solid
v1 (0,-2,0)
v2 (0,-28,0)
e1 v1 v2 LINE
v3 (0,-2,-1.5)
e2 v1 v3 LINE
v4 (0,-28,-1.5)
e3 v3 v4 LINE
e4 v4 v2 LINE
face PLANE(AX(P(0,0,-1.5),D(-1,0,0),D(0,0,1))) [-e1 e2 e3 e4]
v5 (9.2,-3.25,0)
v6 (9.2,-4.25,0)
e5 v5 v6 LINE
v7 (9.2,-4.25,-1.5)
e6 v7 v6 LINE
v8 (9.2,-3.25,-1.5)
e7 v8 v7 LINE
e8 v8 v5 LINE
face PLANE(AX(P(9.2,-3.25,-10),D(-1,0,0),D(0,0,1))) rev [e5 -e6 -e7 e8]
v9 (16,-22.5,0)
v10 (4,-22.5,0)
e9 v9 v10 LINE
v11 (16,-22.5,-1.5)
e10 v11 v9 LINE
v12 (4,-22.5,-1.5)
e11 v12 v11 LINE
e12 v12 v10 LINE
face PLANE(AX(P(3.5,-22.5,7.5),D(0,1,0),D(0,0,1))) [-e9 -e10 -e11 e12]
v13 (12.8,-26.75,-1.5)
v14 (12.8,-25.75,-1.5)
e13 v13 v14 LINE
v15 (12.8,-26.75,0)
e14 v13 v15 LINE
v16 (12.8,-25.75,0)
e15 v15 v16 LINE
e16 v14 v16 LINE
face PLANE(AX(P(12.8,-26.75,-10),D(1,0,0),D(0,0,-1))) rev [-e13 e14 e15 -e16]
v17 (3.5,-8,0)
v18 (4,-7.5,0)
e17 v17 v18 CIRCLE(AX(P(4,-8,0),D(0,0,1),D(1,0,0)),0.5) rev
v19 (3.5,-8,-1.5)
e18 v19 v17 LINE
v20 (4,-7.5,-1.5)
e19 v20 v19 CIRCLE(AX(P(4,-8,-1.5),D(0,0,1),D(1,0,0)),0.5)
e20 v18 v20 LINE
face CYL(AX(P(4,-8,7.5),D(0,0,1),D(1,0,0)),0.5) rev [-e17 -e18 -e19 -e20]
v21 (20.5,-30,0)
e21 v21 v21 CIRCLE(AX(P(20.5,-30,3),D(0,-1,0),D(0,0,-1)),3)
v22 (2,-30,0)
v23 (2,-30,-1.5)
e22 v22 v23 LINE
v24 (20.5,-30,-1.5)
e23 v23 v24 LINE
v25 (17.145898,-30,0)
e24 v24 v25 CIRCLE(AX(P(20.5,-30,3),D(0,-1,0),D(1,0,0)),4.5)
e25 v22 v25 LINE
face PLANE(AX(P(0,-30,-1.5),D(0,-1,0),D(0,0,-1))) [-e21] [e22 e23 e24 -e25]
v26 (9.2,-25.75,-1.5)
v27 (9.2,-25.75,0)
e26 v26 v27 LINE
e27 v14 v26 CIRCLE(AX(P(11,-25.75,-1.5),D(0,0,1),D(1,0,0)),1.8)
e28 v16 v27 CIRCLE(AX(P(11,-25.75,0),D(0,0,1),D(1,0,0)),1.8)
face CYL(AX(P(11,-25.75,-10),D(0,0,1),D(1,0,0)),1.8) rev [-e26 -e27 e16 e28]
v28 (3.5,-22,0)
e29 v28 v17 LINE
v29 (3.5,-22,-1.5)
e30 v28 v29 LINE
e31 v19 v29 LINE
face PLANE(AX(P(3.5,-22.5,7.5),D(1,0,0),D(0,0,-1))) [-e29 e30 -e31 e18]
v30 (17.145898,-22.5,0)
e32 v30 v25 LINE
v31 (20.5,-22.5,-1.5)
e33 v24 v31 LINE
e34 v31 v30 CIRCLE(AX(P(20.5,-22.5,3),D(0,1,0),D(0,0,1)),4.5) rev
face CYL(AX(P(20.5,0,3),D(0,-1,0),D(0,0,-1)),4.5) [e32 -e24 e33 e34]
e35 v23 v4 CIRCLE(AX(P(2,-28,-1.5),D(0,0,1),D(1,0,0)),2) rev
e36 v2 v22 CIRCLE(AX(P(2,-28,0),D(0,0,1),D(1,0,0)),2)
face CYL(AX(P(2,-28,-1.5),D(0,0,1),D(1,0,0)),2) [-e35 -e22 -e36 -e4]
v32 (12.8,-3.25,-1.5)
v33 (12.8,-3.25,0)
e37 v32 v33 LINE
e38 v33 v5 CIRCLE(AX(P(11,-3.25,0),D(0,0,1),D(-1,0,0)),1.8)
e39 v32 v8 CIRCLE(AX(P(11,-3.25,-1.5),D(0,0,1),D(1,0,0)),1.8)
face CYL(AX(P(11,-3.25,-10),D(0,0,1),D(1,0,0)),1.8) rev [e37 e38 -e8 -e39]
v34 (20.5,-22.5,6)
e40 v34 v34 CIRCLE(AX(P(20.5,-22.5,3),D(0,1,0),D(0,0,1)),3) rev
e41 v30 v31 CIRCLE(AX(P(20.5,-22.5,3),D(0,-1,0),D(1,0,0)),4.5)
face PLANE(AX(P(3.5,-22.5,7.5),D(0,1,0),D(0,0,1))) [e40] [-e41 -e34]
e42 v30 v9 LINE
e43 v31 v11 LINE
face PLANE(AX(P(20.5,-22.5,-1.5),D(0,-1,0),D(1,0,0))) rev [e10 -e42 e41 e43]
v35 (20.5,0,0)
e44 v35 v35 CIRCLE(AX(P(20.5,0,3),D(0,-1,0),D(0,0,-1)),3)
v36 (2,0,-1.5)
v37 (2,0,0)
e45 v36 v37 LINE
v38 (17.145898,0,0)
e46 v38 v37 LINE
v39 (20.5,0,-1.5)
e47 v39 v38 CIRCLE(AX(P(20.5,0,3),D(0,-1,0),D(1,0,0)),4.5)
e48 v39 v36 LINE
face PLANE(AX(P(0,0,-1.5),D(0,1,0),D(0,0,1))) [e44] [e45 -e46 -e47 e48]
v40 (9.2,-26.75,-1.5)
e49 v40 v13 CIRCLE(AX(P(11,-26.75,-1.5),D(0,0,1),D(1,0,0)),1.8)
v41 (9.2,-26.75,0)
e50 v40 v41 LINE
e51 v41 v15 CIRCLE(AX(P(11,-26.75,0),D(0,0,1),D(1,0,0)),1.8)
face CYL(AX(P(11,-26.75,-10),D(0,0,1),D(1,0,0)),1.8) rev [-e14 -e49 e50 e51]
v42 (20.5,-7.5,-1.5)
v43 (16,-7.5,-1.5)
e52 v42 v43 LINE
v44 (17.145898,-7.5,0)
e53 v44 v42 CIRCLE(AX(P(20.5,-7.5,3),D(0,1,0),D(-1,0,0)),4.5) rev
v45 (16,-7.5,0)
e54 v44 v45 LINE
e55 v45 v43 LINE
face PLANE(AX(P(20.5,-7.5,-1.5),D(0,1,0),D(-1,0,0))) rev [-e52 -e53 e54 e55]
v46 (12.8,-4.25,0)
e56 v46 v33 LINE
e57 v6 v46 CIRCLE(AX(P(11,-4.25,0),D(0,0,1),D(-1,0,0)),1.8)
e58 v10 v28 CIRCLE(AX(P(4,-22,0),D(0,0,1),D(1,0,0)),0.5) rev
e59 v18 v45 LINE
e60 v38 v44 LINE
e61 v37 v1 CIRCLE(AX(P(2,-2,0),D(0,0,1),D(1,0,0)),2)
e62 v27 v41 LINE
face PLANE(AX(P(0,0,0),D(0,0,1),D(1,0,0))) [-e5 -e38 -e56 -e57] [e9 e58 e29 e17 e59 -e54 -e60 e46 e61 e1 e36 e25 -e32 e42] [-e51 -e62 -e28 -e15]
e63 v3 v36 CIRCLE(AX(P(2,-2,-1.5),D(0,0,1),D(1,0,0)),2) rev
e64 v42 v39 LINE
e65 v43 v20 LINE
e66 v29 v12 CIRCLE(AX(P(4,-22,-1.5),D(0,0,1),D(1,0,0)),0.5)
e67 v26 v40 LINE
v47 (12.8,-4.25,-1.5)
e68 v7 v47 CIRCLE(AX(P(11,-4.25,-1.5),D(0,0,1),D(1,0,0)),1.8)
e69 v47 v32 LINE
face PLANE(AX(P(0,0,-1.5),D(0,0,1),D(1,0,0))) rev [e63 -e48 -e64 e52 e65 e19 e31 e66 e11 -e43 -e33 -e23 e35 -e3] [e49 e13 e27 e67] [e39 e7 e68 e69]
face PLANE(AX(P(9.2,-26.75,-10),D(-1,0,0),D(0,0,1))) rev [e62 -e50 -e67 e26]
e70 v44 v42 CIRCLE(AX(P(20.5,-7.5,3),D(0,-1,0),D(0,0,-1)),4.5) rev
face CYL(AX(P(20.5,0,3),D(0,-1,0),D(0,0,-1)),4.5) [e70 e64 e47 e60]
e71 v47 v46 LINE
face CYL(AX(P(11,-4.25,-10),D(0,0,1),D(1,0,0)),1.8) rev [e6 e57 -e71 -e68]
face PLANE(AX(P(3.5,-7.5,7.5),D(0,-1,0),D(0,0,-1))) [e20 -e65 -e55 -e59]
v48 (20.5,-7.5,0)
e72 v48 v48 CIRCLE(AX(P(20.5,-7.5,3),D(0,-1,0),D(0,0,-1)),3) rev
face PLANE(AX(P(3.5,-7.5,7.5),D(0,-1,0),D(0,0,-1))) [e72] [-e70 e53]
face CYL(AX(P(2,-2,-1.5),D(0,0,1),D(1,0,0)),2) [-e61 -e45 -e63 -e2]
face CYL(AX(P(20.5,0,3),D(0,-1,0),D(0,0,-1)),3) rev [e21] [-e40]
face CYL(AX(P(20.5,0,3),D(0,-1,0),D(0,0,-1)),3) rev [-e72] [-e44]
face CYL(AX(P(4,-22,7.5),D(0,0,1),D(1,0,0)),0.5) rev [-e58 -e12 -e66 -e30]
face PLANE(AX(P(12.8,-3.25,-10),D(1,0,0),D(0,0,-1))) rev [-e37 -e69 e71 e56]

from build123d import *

# Parameters (mm, degrees)
SKETCH_2_W             = 16
SKETCH_2_H             = 30
SM_BASE_FLANGE_1_DEPTH = 1.5
SKETCH_7_R             = 4.5
SKETCH_7_R_2           = 3
EXTRUDE_1_DEPTH        = 30
SKETCH_8_W             = 1.5
SKETCH_8_H             = 7.5
EXTRUDE_1_2_DEPTH      = 4.5
SKETCH_9_W             = 25
SKETCH_9_H             = 15
CUT_EXTRUDE_1_DEPTH    = 41.074929819
FILLET_1_R             = 2
CUT_EXTRUDE_2_DEPTH    = 10
FILLET_2_R             = 0.5


# Sheet-metal steps are written as plain solids
with BuildPart() as part:
    # Sketch 2 → Базовая кромка1 (new body)
    with BuildSketch(Plane.XY):
        with Locations((8, -15)):
            Rectangle(SKETCH_2_W, SKETCH_2_H)
    extrude(amount=-SM_BASE_FLANGE_1_DEPTH)



with BuildPart() as body_2:
    # Эскиз7 → Extrude 1 (new body)
    with BuildSketch(Plane.XZ.offset(30)):
        with Locations((20.5, 3)):
            Circle(SKETCH_7_R)
        with Locations((20.5, 3)):
            Circle(SKETCH_7_R_2, mode=Mode.SUBTRACT)
    extrude(amount=-EXTRUDE_1_DEPTH)


with BuildPart() as part_1:
    add(part.part)

    add(body_2.part)  # Extrude 1 2 merges body 2
    # Эскиз8 → Extrude 1 2 (add)
    with BuildSketch(Plane(origin=(16, 0, 0), x_dir=(0, 0, -1), z_dir=(1, 0, 0))):
        with Locations((0.75, -26.25)):
            Rectangle(SKETCH_8_W, SKETCH_8_H)
        with Locations((0.75, -3.75)):
            Rectangle(SKETCH_8_W, SKETCH_8_H)
    extrude(amount=EXTRUDE_1_2_DEPTH)

    # Эскиз9 → Вырез-Вытянуть1 (cut, through all)
    with BuildSketch(Plane.XY.offset(-1.5)):
        with Locations((16, -15)):
            Rectangle(SKETCH_9_W, SKETCH_9_H)
    extrude(amount=CUT_EXTRUDE_1_DEPTH, mode=Mode.SUBTRACT)

    # Скругление1
    fillet_1_edges = [part_1.edges().sort_by_distance(p)[0] for p in [
        (0, 0, -0.75),
        (0, -30, -0.75),
    ]]
    fillet(fillet_1_edges, radius=FILLET_1_R)

    # Эскиз10 → Вырез-Вытянуть2 (cut)
    with BuildSketch(Plane.XY):
        with BuildLine():
            Line((9.2, -26.75), (9.2, -25.75))
            ThreePointArc((9.2, -25.75), (11, -23.95), (12.8, -25.75))
            Line((12.8, -25.75), (12.8, -26.75))
            ThreePointArc((12.8, -26.75), (11, -28.55), (9.2, -26.75))
        make_face()
        with BuildLine():
            Line((9.2, -3.25), (9.2, -4.25))
            ThreePointArc((9.2, -4.25), (11, -6.05), (12.8, -4.25))
            Line((12.8, -4.25), (12.8, -3.25))
            ThreePointArc((12.8, -3.25), (11, -1.45), (9.2, -3.25))
        make_face()
    extrude(amount=-CUT_EXTRUDE_2_DEPTH, mode=Mode.SUBTRACT)

    # Скругление2
    fillet_2_edges = [part_1.edges().sort_by_distance(p)[0] for p in [
        (3.5, -22.5, -0.75),
        (3.5, -7.5, -0.75),
    ]]
    fillet(fillet_2_edges, radius=FILLET_2_R)


solid = part_1.part
